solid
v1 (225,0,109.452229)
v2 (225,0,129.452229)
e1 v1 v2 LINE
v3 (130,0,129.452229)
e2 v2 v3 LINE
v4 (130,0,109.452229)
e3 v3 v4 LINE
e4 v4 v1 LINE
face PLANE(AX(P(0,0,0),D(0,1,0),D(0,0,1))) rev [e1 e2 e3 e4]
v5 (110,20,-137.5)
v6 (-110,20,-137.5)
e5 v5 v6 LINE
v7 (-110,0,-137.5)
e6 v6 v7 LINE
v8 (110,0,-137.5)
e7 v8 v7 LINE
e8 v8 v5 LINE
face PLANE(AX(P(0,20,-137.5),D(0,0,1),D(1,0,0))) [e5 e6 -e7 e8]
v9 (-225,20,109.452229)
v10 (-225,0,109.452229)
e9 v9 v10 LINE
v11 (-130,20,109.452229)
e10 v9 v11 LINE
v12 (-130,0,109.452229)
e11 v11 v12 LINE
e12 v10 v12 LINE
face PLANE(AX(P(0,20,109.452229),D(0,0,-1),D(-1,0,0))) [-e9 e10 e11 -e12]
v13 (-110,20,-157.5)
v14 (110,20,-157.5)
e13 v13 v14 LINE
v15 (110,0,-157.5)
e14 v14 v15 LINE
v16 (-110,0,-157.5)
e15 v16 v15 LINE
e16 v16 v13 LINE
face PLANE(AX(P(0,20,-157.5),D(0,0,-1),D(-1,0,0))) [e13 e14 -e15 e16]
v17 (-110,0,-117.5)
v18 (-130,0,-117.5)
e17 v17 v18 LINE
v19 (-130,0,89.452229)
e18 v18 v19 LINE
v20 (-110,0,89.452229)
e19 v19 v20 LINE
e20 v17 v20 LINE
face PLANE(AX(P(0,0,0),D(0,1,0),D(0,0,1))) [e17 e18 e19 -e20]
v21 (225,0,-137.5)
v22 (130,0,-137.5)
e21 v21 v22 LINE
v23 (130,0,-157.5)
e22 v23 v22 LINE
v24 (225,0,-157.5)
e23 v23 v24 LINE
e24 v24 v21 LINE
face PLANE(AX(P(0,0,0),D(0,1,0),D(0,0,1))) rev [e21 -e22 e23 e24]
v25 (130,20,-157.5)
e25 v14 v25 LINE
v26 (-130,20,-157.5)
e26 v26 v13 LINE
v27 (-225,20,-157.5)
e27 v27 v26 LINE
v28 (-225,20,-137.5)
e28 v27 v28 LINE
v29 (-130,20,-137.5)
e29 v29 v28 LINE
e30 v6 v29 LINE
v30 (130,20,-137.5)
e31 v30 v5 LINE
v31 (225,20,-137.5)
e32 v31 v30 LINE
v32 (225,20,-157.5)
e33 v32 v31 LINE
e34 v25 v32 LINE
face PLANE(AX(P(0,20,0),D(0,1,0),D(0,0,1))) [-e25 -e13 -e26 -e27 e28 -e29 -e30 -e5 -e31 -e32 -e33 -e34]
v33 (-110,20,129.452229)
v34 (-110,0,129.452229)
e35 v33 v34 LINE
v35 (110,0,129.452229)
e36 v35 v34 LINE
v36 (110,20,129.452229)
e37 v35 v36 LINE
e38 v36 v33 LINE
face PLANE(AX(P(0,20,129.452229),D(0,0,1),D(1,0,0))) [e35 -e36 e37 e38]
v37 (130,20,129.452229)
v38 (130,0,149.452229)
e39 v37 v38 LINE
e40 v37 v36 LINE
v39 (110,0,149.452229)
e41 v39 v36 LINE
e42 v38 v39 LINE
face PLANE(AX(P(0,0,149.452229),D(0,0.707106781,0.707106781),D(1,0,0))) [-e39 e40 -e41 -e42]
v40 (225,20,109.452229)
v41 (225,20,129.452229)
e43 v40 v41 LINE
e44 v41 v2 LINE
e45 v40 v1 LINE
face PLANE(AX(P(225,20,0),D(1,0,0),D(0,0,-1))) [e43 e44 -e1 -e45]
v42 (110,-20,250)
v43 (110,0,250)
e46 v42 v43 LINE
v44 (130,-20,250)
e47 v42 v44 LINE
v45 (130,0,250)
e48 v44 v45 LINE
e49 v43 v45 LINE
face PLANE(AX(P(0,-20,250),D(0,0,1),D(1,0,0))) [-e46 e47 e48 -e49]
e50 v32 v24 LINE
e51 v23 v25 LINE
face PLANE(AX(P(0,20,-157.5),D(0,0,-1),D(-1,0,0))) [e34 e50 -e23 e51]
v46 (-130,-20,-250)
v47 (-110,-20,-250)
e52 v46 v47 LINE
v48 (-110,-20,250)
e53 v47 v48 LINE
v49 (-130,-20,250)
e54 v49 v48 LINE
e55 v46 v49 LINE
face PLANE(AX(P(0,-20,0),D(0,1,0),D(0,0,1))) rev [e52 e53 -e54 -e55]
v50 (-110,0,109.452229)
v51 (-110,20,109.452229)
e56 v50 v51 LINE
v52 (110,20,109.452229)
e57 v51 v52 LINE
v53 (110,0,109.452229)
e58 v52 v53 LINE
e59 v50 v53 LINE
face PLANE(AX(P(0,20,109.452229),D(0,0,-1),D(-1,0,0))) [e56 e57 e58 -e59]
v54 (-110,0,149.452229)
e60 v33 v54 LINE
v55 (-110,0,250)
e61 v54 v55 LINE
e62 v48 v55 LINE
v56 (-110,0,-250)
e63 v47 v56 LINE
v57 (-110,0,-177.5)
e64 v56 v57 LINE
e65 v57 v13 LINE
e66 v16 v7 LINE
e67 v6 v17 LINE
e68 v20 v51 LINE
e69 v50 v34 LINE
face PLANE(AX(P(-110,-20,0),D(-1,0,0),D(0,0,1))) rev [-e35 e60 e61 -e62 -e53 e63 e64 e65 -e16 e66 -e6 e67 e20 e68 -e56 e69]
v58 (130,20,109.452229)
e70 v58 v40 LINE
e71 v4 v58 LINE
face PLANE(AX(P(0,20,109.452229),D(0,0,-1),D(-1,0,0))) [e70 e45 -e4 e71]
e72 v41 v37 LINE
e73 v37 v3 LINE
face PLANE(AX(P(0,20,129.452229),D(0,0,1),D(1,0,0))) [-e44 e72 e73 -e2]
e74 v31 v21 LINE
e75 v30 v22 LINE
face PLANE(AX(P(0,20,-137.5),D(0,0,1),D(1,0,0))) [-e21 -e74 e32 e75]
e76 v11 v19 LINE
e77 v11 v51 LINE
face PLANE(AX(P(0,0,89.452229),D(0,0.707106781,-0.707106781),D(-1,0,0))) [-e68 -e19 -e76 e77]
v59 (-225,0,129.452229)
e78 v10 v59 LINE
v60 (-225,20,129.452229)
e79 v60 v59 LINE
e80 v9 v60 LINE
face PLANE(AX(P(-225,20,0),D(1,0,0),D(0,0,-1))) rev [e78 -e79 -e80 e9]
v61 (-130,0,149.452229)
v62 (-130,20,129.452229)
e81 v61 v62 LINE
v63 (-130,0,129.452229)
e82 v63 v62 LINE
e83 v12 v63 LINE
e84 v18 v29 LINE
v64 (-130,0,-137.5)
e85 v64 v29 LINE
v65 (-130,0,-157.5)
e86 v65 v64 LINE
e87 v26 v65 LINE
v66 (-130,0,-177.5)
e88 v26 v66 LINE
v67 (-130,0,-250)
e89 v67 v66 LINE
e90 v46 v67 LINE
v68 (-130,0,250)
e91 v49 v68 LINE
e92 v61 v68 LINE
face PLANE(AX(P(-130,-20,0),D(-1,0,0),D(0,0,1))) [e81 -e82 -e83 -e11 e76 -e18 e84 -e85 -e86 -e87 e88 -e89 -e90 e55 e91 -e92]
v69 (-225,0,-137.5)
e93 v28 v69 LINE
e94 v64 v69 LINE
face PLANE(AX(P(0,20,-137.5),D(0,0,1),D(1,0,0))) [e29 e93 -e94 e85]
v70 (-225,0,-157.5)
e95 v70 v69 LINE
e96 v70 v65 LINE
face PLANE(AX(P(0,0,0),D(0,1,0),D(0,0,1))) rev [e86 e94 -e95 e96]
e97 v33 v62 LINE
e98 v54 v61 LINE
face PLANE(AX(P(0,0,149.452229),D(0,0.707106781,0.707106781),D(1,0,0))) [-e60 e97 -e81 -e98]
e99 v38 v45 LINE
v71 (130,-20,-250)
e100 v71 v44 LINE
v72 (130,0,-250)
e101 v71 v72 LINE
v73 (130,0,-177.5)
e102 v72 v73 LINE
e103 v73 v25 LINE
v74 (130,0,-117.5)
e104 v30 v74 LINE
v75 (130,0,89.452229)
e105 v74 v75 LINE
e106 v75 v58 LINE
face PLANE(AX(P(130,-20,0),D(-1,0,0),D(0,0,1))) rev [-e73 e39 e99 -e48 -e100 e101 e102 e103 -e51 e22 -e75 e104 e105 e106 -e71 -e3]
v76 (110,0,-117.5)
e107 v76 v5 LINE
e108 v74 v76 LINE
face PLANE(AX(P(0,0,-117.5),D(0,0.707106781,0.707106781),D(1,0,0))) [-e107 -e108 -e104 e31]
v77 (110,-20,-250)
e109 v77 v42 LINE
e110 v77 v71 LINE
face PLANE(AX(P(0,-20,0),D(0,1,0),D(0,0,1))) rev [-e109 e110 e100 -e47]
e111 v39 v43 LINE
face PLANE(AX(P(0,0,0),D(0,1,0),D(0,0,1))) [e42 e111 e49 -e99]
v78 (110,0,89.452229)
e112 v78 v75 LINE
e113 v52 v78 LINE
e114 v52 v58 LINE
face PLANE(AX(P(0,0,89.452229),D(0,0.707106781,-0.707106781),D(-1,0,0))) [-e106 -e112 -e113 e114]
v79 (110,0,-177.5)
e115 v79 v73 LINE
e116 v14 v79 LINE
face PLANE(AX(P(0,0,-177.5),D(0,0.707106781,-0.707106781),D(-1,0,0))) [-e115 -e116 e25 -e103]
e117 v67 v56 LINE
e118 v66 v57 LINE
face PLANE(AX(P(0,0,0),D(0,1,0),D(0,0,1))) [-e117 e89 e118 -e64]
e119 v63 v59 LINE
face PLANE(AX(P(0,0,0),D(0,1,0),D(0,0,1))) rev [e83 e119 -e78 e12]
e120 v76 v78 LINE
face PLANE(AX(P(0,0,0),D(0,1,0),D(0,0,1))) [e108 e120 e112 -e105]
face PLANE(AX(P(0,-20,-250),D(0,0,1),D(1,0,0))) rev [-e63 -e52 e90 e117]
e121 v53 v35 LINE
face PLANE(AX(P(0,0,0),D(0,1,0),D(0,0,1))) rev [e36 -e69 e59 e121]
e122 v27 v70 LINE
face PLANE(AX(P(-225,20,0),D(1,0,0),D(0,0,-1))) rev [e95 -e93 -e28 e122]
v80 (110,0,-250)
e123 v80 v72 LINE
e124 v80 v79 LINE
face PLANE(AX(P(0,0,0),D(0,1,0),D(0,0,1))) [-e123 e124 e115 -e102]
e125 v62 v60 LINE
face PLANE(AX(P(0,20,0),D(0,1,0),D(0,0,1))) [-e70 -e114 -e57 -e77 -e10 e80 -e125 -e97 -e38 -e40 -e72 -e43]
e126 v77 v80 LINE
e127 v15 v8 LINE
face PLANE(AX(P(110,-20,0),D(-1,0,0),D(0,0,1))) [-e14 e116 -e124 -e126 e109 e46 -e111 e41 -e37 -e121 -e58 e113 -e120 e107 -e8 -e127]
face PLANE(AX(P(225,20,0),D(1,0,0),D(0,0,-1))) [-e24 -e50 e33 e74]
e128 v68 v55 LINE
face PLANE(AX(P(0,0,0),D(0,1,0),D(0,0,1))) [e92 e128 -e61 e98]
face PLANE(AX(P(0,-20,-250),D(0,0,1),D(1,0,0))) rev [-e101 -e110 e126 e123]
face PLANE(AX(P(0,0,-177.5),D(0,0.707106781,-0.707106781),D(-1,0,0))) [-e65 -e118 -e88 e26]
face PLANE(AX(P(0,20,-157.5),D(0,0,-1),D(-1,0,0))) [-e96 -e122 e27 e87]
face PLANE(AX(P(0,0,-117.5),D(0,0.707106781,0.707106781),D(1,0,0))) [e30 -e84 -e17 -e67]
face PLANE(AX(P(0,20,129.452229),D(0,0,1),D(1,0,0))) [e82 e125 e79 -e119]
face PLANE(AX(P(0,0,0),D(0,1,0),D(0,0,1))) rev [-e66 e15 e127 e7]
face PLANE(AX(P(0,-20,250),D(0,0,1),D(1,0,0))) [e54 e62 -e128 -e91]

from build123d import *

# Parameters (mm, degrees)
SKETCH_1_W      = 95
SKETCH_1_H      = 20
SKETCH_1_W_2    = 20
SKETCH_1_W_3    = 220
EXTRUDE_4_DEPTH = 20
SKETCH_1_16_W   = 20
SKETCH_1_16_H   = 92.5
SKETCH_1_16_H_2 = 20
SKETCH_1_16_H_3 = 246.95222931
SKETCH_1_16_H_4 = 120.54777069
EXTRUDE_5_DEPTH = 20
CHAMFER_9_SIZE  = 20
CHAMFER_10_SIZE = 20


with BuildPart() as part:
    # 草图1 → 凸台-拉伸4 (new body)
    with BuildSketch(Plane(origin=(0, 0, 0), x_dir=(1, 0, 0), z_dir=(0, 1, 0))):
        with Locations((-177.5, 147.5)):
            Rectangle(SKETCH_1_W, SKETCH_1_H)
        with Locations((-120, 147.5)):
            Rectangle(SKETCH_1_W_2, SKETCH_1_H)
        with Locations((0, 147.5)):
            Rectangle(SKETCH_1_W_3, SKETCH_1_H)
        with Locations((177.5, 147.5)):
            Rectangle(SKETCH_1_W, SKETCH_1_H)
        with Locations((120, 147.5)):
            Rectangle(SKETCH_1_W_2, SKETCH_1_H)
        with Locations((177.5, -119.45222931)):
            Rectangle(SKETCH_1_W, SKETCH_1_H)
        with Locations((120, -119.45222931)):
            Rectangle(SKETCH_1_W_2, SKETCH_1_H)
        with Locations((0, -119.45222931)):
            Rectangle(SKETCH_1_W_3, SKETCH_1_H)
        with Locations((-120, -119.45222931)):
            Rectangle(SKETCH_1_W_2, SKETCH_1_H)
        with Locations((-177.5, -119.45222931)):
            Rectangle(SKETCH_1_W, SKETCH_1_H)
    extrude(amount=EXTRUDE_4_DEPTH)

    # 草图1<16> → 凸台-拉伸5 (add)
    with BuildSketch(Plane(origin=(0, 0, 0), x_dir=(1, 0, 0), z_dir=(0, 1, 0))):
        with Locations((120, 203.75)):
            Rectangle(SKETCH_1_16_W, SKETCH_1_16_H)
        with Locations((120, 147.5)):
            Rectangle(SKETCH_1_16_W, SKETCH_1_16_H_2)
        with Locations((120, 14.023885345)):
            Rectangle(SKETCH_1_16_W, SKETCH_1_16_H_3)
        with Locations((120, -119.45222931)):
            Rectangle(SKETCH_1_16_W, SKETCH_1_16_H_2)
        with Locations((120, -189.726114655)):
            Rectangle(SKETCH_1_16_W, SKETCH_1_16_H_4)
        with Locations((-120, -189.726114655)):
            Rectangle(SKETCH_1_16_W, SKETCH_1_16_H_4)
        with Locations((-120, -119.45222931)):
            Rectangle(SKETCH_1_16_W, SKETCH_1_16_H_2)
        with Locations((-120, 14.023885345)):
            Rectangle(SKETCH_1_16_W, SKETCH_1_16_H_3)
        with Locations((-120, 147.5)):
            Rectangle(SKETCH_1_16_W, SKETCH_1_16_H_2)
        with Locations((-120, 203.75)):
            Rectangle(SKETCH_1_16_W, SKETCH_1_16_H)
    extrude(amount=-EXTRUDE_5_DEPTH)

    # 倒角9
    chamfer_9_edges = [part.edges().sort_by_distance(p)[0] for p in [
        (120, 0, 129.45222931),
    ]]
    chamfer(chamfer_9_edges, length=CHAMFER_9_SIZE - 0.0001)  # a hair under: the kernel refuses the full size

    # 倒角10
    chamfer_10_edges = [part.edges().sort_by_distance(p)[0] for p in [
        (120, 0, -137.5),
        (120, 0, -157.5),
        (120, 0, 109.45222931),
        (-120, 0, 129.45222931),
        (-120, 0, 109.45222931),
        (-120, 0, -137.5),
        (-120, 0, -157.5),
    ]]
    chamfer(chamfer_10_edges, length=CHAMFER_10_SIZE - 0.0001)  # a hair under: the kernel refuses the full size


solid = part.part
